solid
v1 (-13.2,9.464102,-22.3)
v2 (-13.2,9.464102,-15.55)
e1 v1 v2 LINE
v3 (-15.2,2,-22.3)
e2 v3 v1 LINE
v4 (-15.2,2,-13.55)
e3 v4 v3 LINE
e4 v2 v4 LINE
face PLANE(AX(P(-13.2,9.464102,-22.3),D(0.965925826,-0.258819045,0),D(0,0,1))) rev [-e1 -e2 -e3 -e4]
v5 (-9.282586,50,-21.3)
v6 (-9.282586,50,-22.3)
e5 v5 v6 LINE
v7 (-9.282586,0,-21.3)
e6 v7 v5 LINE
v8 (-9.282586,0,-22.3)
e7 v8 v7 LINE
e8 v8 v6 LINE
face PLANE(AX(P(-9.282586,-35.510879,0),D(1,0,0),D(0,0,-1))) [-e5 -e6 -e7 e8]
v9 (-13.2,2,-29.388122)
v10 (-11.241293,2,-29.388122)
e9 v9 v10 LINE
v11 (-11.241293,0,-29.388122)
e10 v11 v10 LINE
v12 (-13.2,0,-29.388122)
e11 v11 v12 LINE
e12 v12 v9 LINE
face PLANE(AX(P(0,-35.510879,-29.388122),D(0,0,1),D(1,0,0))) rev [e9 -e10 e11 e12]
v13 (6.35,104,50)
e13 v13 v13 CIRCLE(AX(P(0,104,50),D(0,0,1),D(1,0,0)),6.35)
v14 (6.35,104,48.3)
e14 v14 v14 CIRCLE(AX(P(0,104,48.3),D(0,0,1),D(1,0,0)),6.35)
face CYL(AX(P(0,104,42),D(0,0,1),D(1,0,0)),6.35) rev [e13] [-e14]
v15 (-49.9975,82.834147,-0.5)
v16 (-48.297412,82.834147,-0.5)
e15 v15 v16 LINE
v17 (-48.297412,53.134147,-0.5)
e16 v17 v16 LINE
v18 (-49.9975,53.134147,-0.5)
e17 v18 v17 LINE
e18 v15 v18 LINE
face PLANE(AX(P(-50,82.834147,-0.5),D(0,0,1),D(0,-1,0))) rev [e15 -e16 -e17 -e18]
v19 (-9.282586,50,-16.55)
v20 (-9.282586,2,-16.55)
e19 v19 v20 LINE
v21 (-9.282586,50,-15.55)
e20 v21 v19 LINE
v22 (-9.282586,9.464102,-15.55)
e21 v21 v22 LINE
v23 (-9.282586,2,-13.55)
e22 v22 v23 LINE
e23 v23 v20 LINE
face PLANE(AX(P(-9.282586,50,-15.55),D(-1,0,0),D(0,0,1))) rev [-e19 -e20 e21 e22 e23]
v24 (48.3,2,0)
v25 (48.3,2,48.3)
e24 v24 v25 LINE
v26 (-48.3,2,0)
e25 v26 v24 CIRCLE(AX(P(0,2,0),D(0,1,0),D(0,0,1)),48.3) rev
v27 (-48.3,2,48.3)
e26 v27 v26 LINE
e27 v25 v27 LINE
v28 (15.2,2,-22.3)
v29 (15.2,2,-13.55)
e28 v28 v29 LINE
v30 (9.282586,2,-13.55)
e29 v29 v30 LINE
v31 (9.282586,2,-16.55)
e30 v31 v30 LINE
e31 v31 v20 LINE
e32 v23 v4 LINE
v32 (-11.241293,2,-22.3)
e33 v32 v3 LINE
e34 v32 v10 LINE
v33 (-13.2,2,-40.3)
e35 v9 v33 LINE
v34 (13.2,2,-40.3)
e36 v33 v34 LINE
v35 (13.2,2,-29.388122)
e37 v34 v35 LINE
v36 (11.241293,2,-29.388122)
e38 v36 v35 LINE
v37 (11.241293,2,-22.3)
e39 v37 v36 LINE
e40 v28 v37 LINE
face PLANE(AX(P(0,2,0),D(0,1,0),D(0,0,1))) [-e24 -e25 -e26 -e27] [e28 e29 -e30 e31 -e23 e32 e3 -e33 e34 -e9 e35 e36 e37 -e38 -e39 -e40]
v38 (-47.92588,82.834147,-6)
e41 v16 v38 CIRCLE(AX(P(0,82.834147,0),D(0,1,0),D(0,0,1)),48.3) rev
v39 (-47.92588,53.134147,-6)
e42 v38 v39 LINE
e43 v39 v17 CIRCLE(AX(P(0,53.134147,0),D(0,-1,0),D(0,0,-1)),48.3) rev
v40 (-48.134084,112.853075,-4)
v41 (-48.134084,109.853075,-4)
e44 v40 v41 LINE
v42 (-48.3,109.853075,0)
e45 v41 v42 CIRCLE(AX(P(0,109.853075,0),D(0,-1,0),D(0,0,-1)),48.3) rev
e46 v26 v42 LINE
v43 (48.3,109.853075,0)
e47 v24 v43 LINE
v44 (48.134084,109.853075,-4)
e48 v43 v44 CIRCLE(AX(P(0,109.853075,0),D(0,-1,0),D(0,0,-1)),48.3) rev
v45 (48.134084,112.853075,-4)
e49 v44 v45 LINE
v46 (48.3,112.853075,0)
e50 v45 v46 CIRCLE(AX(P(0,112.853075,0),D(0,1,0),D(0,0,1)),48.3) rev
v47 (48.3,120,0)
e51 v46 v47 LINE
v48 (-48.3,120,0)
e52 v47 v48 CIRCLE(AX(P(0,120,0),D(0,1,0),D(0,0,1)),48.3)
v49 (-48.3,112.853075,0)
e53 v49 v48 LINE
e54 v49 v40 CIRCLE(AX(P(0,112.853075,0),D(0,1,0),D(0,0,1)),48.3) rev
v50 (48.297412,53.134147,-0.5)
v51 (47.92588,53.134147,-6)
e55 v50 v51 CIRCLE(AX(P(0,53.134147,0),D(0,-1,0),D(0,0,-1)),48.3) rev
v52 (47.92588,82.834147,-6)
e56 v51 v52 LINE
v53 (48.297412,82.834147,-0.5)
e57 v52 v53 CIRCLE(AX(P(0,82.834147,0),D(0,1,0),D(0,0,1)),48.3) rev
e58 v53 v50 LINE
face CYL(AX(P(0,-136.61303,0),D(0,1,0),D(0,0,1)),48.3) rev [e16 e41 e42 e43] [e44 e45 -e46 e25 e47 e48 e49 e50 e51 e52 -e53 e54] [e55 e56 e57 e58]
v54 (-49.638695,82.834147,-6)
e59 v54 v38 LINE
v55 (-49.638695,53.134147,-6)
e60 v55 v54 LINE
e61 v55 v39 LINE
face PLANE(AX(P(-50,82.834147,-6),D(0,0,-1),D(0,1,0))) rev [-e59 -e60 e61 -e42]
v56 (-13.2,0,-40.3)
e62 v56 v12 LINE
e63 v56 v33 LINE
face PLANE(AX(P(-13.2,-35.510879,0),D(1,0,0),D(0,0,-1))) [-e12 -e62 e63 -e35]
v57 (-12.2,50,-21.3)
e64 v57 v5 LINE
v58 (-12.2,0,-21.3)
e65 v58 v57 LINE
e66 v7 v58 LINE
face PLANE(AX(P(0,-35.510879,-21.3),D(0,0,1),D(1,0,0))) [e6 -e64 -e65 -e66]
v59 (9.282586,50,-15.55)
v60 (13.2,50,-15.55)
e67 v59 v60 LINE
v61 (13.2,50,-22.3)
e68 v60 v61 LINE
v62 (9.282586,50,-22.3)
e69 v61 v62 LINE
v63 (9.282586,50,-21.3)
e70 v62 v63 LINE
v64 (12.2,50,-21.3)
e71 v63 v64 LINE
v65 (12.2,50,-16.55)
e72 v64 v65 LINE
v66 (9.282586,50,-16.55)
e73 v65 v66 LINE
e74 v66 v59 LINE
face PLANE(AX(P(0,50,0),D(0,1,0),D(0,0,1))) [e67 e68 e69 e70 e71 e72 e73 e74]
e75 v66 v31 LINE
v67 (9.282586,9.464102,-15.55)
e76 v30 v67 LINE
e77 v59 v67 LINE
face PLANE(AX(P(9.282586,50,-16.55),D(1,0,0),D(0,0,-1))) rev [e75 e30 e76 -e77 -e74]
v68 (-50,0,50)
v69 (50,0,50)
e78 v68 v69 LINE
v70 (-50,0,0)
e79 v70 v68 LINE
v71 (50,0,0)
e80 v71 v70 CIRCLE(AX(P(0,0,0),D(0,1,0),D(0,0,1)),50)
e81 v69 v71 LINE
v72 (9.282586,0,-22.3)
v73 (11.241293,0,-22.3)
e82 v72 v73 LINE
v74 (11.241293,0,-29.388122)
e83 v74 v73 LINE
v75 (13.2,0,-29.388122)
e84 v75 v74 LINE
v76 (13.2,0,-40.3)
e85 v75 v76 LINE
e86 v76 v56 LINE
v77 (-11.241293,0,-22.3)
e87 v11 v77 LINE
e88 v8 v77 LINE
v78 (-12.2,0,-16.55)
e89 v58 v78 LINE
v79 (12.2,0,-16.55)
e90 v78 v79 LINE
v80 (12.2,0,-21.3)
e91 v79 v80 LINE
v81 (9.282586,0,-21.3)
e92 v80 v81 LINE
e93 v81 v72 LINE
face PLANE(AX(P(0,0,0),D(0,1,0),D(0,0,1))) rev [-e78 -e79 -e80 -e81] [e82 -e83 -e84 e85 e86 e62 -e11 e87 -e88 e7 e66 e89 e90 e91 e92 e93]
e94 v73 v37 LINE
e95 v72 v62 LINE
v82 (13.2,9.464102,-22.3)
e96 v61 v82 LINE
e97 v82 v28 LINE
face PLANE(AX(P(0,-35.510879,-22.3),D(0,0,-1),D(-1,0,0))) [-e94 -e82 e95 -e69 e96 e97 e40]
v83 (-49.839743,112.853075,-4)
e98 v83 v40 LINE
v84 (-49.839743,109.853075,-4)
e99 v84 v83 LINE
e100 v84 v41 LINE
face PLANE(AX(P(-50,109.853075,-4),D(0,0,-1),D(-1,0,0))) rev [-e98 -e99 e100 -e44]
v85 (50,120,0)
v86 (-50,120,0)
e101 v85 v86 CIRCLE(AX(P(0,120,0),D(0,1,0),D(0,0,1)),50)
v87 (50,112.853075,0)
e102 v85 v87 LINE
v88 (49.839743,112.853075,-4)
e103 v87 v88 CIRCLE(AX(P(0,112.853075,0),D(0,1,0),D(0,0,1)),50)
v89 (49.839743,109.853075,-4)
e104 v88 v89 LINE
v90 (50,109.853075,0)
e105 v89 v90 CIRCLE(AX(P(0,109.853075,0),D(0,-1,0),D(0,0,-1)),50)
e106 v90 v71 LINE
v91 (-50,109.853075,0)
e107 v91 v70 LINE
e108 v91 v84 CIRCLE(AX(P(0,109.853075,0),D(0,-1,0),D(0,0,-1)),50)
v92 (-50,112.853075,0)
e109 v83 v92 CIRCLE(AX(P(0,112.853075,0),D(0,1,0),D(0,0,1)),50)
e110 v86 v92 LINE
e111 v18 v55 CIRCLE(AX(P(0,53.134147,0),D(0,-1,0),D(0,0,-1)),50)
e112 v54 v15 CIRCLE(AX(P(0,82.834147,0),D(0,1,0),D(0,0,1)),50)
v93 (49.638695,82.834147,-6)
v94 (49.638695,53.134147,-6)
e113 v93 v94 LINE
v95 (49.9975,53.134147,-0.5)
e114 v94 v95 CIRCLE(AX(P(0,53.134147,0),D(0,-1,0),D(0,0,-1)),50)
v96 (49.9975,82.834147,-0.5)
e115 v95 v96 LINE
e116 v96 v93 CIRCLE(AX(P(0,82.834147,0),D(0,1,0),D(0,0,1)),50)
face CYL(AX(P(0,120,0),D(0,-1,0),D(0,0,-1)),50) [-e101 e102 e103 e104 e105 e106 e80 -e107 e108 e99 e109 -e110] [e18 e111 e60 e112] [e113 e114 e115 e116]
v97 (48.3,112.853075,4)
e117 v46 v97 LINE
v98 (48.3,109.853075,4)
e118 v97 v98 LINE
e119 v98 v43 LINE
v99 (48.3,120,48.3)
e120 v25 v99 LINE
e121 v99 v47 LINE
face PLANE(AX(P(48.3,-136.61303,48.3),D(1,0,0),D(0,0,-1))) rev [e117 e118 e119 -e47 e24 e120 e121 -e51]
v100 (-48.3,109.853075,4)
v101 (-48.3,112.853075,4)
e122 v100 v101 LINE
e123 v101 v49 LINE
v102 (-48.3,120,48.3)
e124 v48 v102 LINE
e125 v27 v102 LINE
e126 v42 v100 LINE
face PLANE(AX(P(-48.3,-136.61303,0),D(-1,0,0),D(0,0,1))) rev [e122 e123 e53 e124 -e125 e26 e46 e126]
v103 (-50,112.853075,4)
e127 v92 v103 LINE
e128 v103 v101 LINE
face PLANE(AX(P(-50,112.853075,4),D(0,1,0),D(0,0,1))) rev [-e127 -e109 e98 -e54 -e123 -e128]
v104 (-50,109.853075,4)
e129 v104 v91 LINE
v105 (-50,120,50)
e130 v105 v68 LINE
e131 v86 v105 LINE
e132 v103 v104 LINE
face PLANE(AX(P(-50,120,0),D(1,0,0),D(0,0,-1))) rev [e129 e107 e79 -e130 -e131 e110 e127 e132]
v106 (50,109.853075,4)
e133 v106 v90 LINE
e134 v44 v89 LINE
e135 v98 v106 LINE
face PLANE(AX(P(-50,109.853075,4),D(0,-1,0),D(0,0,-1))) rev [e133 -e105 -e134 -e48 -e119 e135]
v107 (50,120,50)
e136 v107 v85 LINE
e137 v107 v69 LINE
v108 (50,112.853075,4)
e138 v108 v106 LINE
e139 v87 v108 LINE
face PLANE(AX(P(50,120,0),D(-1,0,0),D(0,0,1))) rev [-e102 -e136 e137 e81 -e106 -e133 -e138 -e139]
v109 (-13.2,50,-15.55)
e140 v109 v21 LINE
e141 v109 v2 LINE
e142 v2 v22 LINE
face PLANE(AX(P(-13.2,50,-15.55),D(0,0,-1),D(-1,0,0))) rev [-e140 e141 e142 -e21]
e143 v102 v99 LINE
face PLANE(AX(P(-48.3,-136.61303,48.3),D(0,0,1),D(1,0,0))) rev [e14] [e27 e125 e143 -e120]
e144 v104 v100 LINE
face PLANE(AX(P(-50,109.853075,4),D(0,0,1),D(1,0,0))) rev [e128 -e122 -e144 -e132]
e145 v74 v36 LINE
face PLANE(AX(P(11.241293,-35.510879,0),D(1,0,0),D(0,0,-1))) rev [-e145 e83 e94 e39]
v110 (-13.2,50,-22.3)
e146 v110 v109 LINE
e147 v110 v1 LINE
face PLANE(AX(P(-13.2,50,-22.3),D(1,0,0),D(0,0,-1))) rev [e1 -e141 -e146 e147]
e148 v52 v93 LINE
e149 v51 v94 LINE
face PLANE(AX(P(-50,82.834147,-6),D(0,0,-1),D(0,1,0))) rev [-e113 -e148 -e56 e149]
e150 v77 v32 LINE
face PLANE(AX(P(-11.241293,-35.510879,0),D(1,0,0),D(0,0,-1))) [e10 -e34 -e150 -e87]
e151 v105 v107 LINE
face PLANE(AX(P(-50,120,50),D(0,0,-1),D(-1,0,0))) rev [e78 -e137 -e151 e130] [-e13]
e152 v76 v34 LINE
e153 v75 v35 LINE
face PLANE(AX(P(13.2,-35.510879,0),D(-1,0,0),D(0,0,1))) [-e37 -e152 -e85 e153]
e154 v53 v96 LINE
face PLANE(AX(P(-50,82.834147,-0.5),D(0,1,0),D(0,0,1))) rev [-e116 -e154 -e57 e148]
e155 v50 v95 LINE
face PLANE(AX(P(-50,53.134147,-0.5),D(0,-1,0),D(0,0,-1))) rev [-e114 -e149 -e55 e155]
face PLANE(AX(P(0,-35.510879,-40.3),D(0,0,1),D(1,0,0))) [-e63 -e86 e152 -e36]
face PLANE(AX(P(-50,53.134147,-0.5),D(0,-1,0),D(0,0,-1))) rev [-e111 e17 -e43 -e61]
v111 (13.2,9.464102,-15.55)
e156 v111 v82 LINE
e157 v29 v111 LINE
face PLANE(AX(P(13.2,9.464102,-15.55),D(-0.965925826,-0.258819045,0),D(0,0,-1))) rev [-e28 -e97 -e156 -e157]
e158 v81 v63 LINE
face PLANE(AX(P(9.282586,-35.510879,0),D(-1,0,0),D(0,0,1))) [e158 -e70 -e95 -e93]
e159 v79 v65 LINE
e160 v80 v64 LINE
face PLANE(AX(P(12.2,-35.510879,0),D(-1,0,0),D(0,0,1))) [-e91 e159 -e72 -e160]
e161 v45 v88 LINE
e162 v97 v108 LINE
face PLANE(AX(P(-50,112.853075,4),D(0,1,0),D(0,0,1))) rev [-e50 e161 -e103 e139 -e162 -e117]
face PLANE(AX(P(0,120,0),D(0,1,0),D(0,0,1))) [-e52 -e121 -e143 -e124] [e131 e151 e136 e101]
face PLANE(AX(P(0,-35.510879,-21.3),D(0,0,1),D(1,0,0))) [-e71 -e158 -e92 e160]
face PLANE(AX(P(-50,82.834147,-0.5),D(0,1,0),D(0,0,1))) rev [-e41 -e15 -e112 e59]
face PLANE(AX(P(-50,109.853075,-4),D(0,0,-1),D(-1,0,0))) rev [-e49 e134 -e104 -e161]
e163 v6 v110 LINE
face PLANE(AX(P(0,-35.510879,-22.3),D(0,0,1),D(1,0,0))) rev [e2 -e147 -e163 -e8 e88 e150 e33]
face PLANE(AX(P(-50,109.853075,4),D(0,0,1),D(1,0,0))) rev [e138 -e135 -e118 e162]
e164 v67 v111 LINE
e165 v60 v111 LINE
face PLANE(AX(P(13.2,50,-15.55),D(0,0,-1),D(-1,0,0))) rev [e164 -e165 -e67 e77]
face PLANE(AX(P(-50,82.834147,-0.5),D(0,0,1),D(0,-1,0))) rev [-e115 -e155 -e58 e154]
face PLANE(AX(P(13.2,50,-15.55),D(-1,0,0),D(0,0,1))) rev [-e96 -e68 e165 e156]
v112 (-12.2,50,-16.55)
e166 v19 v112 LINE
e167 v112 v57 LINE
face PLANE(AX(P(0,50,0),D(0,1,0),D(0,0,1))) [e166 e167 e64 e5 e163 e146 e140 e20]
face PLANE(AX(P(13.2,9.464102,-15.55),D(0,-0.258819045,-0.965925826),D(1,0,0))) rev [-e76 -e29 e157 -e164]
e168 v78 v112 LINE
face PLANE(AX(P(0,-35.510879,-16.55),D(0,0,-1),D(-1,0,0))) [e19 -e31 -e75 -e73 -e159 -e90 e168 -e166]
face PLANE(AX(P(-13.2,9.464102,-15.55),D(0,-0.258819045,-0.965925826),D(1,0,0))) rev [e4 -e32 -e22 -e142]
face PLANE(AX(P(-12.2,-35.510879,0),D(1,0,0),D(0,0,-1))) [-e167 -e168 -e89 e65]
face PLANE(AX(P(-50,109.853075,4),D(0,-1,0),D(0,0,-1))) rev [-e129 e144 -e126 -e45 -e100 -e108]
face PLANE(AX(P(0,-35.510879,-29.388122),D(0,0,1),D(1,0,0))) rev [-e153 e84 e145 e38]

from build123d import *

# Parameters (mm, degrees)
BOSS_EXTRUDE1_DEPTH = 120
CUT_EXTRUDE1_DEPTH  = 118
SKETCH18_R          = 6.35
CUT_EXTRUDE9_DEPTH  = 8
CUT_EXTRUDE10_START = -2
CUT_EXTRUDE10_DEPTH = 2
BOSS_EXTRUDE2_DEPTH = 48
CHAMFER1_SIZE       = 2
CHAMFER1_SIZE2      = 7.464101615
SKETCH20_W          = 5.5
SKETCH20_H          = 29.700000001
SKETCH20_W_2        = 8
SKETCH20_H_2        = 3
CUT_EXTRUDE11_DEPTH = 165.012194669


# Read off the part's stored shape, not the designer's step: Cut-Extrude10, Boss-Extrude2
with BuildPart() as part:
    # Sketch2 → Boss-Extrude1 (new body)
    with BuildSketch(Plane(origin=(0, 0, 0), x_dir=(1, 0, 0), z_dir=(0, 1, 0))):
        with BuildLine():
            Line((-50, 0), (-50, -50))
            Line((-50, -50), (50, -50))
            Line((50, -50), (50, 0))
            ThreePointArc((50, 0), (0, 50), (-50, 0))
        make_face()
    extrude(amount=BOSS_EXTRUDE1_DEPTH)

    # Sketch3 → Cut-Extrude1 (cut)
    with BuildSketch(Plane(origin=(0, 120, 0), x_dir=(1, 0, 0), z_dir=(0, 1, 0))):
        with BuildLine():
            Line((-48.3, 0), (-48.3, -48.3))
            Line((-48.3, -48.3), (48.3, -48.3))
            Line((48.3, -48.3), (48.3, 0))
            ThreePointArc((48.3, 0), (0, 48.3), (-48.3, 0))
        make_face()
    extrude(amount=-CUT_EXTRUDE1_DEPTH, mode=Mode.SUBTRACT)

    # Sketch18 → Cut-Extrude9 (cut)
    with BuildSketch(Plane.XY.offset(50)):
        with Locations((0, 104)):
            Circle(SKETCH18_R)
    extrude(amount=-CUT_EXTRUDE9_DEPTH, mode=Mode.SUBTRACT)

    # Cut-Extrude10 outline → Cut-Extrude10 (cut)
    with BuildSketch(Plane(origin=(0, 2, 0), x_dir=(1, 0, 0), z_dir=(0, 1, 0)).offset(CUT_EXTRUDE10_START)):
        Polygon((12.2, 16.55), (12.2, 21.3), (9.282585541, 21.3), (9.282585541, 22.3), (11.241292771, 22.3), (11.241292771, 29.388121527), (13.2, 29.388121527), (13.2, 40.3), (-13.2, 40.3), (-13.2, 29.388121527), (-11.241292771, 29.388121527), (-11.241292771, 22.3), (-9.282585541, 22.3), (-9.282585541, 21.3), (-12.2, 21.3), (-12.2, 16.55), align=None)
    extrude(amount=CUT_EXTRUDE10_DEPTH, mode=Mode.SUBTRACT)

    # Boss-Extrude2 outline → Boss-Extrude2 (add)
    with BuildSketch(Plane(origin=(0, 2, 0), x_dir=(1, 0, 0), z_dir=(0, 1, 0))):
        Polygon((9.282585541, 21.3), (12.2, 21.3), (12.2, 16.55), (9.282585541, 16.55), (9.282585541, 15.55), (13.2, 15.55), (13.2, 22.3), (9.282585541, 22.3), align=None)
        Polygon((-9.282585541, 15.55), (-9.282585541, 16.55), (-12.2, 16.55), (-12.2, 21.3), (-9.282585541, 21.3), (-9.282585541, 22.3), (-13.2, 22.3), (-13.2, 15.55), align=None)
    extrude(amount=BOSS_EXTRUDE2_DEPTH)

    # Chamfer1
    chamfer1_edges = [part.edges().sort_by_distance(p)[0] for p in [
        (13.2, 2, -18.925),
        (11.24129277, 2, -15.55),
        (-13.2, 2, -18.925),
        (-11.24129277, 2, -15.55),
    ]]
    chamfer1_side = [part.faces().sort_by_distance(p)[0] for p in [
        (0, 2, 7.094220812),
    ]]
    chamfer(chamfer1_edges, length=CHAMFER1_SIZE, length2=CHAMFER1_SIZE2, reference=chamfer1_side[0])

    # Sketch20 → Cut-Extrude11 (cut, through all)
    with BuildSketch(Plane(origin=(50, 0, 0), x_dir=(0, 0, -1), z_dir=(1, 0, 0))):
        with Locations((3.25, 67.984146729)):
            Rectangle(SKETCH20_W, SKETCH20_H)
        with Locations((0, 111.353074805)):
            Rectangle(SKETCH20_W_2, SKETCH20_H_2)
    extrude(amount=-CUT_EXTRUDE11_DEPTH, mode=Mode.SUBTRACT)


solid = part.part
